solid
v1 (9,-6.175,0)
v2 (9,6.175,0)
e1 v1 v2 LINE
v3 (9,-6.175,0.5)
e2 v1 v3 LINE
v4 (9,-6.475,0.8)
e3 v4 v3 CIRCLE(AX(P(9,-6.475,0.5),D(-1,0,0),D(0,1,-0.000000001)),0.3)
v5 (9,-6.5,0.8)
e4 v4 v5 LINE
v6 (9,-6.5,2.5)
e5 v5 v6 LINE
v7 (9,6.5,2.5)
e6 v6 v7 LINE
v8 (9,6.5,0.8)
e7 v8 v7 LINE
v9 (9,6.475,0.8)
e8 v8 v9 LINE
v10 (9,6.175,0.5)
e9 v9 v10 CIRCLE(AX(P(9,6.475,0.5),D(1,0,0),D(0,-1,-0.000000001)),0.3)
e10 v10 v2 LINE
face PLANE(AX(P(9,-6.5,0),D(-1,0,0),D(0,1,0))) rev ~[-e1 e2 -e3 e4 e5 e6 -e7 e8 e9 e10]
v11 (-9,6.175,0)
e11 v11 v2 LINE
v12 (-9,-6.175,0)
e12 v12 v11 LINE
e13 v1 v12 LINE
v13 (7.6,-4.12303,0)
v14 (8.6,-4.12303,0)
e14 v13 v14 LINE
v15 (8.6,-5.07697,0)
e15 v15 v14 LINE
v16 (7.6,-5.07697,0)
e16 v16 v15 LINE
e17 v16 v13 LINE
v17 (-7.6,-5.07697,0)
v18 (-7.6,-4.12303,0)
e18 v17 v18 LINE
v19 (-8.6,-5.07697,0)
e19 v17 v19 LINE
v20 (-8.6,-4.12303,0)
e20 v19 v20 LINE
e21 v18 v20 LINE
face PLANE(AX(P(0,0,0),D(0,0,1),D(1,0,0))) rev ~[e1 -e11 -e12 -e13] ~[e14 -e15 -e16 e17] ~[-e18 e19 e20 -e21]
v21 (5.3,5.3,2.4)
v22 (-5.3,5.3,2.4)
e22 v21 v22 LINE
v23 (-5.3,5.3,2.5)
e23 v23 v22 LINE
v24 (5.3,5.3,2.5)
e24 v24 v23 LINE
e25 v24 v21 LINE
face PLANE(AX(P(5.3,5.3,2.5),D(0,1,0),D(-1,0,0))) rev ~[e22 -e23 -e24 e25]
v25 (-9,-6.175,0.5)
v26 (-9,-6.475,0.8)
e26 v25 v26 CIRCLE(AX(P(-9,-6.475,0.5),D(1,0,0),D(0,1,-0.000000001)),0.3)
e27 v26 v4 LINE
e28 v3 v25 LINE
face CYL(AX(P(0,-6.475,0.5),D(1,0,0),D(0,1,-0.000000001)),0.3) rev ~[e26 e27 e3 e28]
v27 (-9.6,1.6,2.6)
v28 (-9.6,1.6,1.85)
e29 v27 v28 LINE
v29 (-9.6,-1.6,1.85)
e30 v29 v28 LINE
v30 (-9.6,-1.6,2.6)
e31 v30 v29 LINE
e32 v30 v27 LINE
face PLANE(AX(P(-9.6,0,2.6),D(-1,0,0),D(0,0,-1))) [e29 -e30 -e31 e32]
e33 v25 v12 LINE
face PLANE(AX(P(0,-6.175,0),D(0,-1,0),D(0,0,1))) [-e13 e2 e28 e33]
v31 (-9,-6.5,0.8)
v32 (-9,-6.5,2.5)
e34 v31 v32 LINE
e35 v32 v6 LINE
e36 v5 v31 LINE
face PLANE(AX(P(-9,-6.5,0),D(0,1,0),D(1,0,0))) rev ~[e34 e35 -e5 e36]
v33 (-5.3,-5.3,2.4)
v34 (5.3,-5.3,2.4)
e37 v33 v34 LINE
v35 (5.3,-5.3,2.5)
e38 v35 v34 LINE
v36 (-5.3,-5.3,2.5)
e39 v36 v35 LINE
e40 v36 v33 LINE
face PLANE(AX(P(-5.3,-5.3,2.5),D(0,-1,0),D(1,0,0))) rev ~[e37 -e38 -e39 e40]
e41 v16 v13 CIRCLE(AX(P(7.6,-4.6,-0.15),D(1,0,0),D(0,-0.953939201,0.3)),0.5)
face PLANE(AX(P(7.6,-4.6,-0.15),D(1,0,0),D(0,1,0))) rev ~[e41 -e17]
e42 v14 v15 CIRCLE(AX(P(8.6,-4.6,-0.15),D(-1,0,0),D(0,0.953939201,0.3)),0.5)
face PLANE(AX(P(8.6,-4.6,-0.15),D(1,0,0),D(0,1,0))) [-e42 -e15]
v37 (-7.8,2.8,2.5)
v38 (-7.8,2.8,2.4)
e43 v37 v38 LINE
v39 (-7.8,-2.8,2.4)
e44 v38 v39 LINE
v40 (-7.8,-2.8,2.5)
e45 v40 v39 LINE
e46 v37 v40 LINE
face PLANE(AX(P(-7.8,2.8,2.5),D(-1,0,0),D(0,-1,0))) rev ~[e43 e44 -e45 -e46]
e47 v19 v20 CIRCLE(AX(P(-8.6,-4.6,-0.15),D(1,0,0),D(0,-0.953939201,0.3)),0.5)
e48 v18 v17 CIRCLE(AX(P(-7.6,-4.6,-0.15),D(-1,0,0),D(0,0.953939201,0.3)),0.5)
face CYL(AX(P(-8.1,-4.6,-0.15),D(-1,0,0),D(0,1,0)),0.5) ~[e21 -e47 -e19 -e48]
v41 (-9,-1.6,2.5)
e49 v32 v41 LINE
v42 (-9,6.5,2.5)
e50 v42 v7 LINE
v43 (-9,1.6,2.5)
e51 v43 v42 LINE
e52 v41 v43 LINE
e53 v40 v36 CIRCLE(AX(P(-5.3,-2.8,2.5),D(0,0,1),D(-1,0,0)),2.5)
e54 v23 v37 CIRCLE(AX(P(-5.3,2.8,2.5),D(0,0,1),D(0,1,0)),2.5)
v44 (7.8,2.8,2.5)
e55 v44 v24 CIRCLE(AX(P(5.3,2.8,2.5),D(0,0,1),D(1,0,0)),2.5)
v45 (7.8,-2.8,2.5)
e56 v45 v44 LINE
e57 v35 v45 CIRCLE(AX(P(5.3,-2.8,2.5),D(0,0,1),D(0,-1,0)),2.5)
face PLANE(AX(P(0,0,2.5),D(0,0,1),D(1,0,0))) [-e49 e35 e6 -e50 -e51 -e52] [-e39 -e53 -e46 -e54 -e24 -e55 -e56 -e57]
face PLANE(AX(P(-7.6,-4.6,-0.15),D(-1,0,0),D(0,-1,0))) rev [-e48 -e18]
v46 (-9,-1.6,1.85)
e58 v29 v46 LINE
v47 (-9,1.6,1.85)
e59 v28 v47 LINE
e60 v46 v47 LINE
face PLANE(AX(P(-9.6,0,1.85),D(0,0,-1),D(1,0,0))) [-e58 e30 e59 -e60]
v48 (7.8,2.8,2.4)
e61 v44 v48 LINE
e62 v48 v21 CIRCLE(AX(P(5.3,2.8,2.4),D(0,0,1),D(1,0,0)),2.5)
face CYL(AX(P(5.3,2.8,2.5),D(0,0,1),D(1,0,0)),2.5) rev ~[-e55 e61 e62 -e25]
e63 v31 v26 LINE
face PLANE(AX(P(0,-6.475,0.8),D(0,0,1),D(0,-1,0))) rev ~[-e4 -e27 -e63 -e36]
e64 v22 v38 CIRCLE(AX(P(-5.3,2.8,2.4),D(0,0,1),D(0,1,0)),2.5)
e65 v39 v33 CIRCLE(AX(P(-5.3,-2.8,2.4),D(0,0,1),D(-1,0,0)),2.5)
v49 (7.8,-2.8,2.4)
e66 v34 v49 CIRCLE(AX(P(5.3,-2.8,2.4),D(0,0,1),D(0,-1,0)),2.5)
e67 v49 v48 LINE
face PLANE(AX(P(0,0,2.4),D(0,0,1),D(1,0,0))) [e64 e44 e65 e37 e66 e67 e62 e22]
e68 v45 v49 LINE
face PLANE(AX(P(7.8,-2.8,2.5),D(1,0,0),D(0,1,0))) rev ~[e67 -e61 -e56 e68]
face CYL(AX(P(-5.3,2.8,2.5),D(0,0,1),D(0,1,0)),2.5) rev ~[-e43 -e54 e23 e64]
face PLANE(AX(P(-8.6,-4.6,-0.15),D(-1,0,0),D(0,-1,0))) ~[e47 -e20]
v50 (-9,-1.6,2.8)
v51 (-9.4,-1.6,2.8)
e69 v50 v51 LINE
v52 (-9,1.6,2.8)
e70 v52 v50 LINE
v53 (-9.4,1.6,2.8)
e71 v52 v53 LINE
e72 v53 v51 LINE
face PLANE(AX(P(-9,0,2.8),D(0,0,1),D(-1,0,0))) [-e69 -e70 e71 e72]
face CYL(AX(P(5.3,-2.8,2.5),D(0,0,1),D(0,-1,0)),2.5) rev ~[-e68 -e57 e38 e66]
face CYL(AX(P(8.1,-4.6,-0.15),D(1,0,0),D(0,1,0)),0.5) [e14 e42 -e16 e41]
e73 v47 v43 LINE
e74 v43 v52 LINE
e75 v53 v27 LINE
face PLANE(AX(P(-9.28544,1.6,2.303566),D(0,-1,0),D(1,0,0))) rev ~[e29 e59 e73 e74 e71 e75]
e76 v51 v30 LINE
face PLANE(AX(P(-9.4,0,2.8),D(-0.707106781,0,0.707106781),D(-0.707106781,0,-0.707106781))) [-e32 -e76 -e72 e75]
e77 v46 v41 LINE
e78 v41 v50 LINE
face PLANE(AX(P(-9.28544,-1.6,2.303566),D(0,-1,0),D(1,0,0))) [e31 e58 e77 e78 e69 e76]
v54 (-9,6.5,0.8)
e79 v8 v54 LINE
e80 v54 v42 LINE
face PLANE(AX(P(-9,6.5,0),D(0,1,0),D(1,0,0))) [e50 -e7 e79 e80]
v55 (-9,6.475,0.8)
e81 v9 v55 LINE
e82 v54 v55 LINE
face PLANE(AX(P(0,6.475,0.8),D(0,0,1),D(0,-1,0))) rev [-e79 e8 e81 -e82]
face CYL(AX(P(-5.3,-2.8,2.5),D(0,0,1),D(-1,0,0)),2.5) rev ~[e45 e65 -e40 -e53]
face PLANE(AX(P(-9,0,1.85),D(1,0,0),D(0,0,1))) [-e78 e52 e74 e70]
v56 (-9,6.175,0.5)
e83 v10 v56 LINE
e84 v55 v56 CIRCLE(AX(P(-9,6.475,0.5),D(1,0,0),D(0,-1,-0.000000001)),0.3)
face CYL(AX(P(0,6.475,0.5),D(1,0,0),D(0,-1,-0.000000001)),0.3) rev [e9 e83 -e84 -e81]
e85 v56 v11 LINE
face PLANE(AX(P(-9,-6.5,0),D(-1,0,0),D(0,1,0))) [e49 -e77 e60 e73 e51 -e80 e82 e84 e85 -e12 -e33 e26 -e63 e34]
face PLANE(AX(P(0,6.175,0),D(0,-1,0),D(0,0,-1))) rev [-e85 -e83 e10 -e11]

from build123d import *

# Parameters (mm, degrees)
F0_W          = 18
F0_H          = 13
F1_DEPTH      = 2.5
F3_DEPTH      = 0.1
F5_R          = 0.5
F6_DEPTH      = 0.5
F8_DEPTH      = 9.001
F8_DEPTH_BACK = 9.001
F10_DEPTH     = 1.6


# Not quite as in the source:
# - a pattern or mirror of a feature is missing from the dataset's text; its kind, count and spacing are read off the source's solid


with BuildPart() as f1:
    # F0 (on Top) → F1 (new body)
    with BuildSketch(Plane.XY):
        Rectangle(F0_W, F0_H)
    extrude(amount=F1_DEPTH)

    # F2 (on face) → F3 (cut)
    with BuildSketch(Plane.XY.offset(2.5)):
        with BuildLine():
            ThreePointArc((7.8, 2.8), (7.067766953, 4.567766953), (5.3, 5.3))
            Line((5.3, 5.3), (-5.3, 5.3))
            ThreePointArc((-5.3, 5.3), (-7.067766953, 4.567766953), (-7.8, 2.8))
            Line((-7.8, 2.8), (-7.8, -2.8))
            ThreePointArc((-7.8, -2.8), (-7.067766953, -4.567766953), (-5.3, -5.3))
            Line((-5.3, -5.3), (5.3, -5.3))
            ThreePointArc((5.3, -5.3), (7.067766953, -4.567766953), (7.8, -2.8))
            Line((7.8, -2.8), (7.8, 2.8))
        make_face()
    extrude(amount=-F3_DEPTH, mode=Mode.SUBTRACT)

    # F5 (on offset) → F6 (join, symmetric)
    with BuildSketch(Plane.YZ.offset(8.1)):
        with Locations((-4.6, -0.15)):
            Circle(F5_R)
    f6 = extrude(amount=F6_DEPTH, both=True)

    # F6_copies: F6 across plane
    add(f6.mirror(Plane(origin=(0, 0, 0), x_dir=(0, 0, -1), z_dir=(-1, 0, 0))))

    # F7 (on Right) → F8 (cut, two sides)
    with BuildSketch(Plane.YZ) as f8_sk:
        with BuildLine():
            Line((-6.5, 0.8), (-6.5, 0))
            Line((-6.5, 0), (-6.175, 0))
            Line((-6.175, 0), (-6.175, 0.5))
            ThreePointArc((-6.175, 0.5), (-6.2628679656, 0.7121320344), (-6.475, 0.8))
            Line((-6.475, 0.8), (-6.5, 0.8))
        make_face()
    f8 = extrude(amount=-F8_DEPTH, mode=Mode.SUBTRACT) + extrude(f8_sk.sketch, amount=F8_DEPTH_BACK, mode=Mode.SUBTRACT)

    # F8_copies: F8 across plane
    add(f8.mirror(Plane.ZX), mode=Mode.SUBTRACT)

    # F9 (on Front) → F10 (join, symmetric)
    with BuildSketch(Plane.XZ):
        Polygon((-9, 1.85), (-9, 2.8), (-9.4, 2.8), (-9.6, 2.6), (-9.6, 1.85), align=None)
    extrude(amount=F10_DEPTH, both=True)


solid = f1.part
